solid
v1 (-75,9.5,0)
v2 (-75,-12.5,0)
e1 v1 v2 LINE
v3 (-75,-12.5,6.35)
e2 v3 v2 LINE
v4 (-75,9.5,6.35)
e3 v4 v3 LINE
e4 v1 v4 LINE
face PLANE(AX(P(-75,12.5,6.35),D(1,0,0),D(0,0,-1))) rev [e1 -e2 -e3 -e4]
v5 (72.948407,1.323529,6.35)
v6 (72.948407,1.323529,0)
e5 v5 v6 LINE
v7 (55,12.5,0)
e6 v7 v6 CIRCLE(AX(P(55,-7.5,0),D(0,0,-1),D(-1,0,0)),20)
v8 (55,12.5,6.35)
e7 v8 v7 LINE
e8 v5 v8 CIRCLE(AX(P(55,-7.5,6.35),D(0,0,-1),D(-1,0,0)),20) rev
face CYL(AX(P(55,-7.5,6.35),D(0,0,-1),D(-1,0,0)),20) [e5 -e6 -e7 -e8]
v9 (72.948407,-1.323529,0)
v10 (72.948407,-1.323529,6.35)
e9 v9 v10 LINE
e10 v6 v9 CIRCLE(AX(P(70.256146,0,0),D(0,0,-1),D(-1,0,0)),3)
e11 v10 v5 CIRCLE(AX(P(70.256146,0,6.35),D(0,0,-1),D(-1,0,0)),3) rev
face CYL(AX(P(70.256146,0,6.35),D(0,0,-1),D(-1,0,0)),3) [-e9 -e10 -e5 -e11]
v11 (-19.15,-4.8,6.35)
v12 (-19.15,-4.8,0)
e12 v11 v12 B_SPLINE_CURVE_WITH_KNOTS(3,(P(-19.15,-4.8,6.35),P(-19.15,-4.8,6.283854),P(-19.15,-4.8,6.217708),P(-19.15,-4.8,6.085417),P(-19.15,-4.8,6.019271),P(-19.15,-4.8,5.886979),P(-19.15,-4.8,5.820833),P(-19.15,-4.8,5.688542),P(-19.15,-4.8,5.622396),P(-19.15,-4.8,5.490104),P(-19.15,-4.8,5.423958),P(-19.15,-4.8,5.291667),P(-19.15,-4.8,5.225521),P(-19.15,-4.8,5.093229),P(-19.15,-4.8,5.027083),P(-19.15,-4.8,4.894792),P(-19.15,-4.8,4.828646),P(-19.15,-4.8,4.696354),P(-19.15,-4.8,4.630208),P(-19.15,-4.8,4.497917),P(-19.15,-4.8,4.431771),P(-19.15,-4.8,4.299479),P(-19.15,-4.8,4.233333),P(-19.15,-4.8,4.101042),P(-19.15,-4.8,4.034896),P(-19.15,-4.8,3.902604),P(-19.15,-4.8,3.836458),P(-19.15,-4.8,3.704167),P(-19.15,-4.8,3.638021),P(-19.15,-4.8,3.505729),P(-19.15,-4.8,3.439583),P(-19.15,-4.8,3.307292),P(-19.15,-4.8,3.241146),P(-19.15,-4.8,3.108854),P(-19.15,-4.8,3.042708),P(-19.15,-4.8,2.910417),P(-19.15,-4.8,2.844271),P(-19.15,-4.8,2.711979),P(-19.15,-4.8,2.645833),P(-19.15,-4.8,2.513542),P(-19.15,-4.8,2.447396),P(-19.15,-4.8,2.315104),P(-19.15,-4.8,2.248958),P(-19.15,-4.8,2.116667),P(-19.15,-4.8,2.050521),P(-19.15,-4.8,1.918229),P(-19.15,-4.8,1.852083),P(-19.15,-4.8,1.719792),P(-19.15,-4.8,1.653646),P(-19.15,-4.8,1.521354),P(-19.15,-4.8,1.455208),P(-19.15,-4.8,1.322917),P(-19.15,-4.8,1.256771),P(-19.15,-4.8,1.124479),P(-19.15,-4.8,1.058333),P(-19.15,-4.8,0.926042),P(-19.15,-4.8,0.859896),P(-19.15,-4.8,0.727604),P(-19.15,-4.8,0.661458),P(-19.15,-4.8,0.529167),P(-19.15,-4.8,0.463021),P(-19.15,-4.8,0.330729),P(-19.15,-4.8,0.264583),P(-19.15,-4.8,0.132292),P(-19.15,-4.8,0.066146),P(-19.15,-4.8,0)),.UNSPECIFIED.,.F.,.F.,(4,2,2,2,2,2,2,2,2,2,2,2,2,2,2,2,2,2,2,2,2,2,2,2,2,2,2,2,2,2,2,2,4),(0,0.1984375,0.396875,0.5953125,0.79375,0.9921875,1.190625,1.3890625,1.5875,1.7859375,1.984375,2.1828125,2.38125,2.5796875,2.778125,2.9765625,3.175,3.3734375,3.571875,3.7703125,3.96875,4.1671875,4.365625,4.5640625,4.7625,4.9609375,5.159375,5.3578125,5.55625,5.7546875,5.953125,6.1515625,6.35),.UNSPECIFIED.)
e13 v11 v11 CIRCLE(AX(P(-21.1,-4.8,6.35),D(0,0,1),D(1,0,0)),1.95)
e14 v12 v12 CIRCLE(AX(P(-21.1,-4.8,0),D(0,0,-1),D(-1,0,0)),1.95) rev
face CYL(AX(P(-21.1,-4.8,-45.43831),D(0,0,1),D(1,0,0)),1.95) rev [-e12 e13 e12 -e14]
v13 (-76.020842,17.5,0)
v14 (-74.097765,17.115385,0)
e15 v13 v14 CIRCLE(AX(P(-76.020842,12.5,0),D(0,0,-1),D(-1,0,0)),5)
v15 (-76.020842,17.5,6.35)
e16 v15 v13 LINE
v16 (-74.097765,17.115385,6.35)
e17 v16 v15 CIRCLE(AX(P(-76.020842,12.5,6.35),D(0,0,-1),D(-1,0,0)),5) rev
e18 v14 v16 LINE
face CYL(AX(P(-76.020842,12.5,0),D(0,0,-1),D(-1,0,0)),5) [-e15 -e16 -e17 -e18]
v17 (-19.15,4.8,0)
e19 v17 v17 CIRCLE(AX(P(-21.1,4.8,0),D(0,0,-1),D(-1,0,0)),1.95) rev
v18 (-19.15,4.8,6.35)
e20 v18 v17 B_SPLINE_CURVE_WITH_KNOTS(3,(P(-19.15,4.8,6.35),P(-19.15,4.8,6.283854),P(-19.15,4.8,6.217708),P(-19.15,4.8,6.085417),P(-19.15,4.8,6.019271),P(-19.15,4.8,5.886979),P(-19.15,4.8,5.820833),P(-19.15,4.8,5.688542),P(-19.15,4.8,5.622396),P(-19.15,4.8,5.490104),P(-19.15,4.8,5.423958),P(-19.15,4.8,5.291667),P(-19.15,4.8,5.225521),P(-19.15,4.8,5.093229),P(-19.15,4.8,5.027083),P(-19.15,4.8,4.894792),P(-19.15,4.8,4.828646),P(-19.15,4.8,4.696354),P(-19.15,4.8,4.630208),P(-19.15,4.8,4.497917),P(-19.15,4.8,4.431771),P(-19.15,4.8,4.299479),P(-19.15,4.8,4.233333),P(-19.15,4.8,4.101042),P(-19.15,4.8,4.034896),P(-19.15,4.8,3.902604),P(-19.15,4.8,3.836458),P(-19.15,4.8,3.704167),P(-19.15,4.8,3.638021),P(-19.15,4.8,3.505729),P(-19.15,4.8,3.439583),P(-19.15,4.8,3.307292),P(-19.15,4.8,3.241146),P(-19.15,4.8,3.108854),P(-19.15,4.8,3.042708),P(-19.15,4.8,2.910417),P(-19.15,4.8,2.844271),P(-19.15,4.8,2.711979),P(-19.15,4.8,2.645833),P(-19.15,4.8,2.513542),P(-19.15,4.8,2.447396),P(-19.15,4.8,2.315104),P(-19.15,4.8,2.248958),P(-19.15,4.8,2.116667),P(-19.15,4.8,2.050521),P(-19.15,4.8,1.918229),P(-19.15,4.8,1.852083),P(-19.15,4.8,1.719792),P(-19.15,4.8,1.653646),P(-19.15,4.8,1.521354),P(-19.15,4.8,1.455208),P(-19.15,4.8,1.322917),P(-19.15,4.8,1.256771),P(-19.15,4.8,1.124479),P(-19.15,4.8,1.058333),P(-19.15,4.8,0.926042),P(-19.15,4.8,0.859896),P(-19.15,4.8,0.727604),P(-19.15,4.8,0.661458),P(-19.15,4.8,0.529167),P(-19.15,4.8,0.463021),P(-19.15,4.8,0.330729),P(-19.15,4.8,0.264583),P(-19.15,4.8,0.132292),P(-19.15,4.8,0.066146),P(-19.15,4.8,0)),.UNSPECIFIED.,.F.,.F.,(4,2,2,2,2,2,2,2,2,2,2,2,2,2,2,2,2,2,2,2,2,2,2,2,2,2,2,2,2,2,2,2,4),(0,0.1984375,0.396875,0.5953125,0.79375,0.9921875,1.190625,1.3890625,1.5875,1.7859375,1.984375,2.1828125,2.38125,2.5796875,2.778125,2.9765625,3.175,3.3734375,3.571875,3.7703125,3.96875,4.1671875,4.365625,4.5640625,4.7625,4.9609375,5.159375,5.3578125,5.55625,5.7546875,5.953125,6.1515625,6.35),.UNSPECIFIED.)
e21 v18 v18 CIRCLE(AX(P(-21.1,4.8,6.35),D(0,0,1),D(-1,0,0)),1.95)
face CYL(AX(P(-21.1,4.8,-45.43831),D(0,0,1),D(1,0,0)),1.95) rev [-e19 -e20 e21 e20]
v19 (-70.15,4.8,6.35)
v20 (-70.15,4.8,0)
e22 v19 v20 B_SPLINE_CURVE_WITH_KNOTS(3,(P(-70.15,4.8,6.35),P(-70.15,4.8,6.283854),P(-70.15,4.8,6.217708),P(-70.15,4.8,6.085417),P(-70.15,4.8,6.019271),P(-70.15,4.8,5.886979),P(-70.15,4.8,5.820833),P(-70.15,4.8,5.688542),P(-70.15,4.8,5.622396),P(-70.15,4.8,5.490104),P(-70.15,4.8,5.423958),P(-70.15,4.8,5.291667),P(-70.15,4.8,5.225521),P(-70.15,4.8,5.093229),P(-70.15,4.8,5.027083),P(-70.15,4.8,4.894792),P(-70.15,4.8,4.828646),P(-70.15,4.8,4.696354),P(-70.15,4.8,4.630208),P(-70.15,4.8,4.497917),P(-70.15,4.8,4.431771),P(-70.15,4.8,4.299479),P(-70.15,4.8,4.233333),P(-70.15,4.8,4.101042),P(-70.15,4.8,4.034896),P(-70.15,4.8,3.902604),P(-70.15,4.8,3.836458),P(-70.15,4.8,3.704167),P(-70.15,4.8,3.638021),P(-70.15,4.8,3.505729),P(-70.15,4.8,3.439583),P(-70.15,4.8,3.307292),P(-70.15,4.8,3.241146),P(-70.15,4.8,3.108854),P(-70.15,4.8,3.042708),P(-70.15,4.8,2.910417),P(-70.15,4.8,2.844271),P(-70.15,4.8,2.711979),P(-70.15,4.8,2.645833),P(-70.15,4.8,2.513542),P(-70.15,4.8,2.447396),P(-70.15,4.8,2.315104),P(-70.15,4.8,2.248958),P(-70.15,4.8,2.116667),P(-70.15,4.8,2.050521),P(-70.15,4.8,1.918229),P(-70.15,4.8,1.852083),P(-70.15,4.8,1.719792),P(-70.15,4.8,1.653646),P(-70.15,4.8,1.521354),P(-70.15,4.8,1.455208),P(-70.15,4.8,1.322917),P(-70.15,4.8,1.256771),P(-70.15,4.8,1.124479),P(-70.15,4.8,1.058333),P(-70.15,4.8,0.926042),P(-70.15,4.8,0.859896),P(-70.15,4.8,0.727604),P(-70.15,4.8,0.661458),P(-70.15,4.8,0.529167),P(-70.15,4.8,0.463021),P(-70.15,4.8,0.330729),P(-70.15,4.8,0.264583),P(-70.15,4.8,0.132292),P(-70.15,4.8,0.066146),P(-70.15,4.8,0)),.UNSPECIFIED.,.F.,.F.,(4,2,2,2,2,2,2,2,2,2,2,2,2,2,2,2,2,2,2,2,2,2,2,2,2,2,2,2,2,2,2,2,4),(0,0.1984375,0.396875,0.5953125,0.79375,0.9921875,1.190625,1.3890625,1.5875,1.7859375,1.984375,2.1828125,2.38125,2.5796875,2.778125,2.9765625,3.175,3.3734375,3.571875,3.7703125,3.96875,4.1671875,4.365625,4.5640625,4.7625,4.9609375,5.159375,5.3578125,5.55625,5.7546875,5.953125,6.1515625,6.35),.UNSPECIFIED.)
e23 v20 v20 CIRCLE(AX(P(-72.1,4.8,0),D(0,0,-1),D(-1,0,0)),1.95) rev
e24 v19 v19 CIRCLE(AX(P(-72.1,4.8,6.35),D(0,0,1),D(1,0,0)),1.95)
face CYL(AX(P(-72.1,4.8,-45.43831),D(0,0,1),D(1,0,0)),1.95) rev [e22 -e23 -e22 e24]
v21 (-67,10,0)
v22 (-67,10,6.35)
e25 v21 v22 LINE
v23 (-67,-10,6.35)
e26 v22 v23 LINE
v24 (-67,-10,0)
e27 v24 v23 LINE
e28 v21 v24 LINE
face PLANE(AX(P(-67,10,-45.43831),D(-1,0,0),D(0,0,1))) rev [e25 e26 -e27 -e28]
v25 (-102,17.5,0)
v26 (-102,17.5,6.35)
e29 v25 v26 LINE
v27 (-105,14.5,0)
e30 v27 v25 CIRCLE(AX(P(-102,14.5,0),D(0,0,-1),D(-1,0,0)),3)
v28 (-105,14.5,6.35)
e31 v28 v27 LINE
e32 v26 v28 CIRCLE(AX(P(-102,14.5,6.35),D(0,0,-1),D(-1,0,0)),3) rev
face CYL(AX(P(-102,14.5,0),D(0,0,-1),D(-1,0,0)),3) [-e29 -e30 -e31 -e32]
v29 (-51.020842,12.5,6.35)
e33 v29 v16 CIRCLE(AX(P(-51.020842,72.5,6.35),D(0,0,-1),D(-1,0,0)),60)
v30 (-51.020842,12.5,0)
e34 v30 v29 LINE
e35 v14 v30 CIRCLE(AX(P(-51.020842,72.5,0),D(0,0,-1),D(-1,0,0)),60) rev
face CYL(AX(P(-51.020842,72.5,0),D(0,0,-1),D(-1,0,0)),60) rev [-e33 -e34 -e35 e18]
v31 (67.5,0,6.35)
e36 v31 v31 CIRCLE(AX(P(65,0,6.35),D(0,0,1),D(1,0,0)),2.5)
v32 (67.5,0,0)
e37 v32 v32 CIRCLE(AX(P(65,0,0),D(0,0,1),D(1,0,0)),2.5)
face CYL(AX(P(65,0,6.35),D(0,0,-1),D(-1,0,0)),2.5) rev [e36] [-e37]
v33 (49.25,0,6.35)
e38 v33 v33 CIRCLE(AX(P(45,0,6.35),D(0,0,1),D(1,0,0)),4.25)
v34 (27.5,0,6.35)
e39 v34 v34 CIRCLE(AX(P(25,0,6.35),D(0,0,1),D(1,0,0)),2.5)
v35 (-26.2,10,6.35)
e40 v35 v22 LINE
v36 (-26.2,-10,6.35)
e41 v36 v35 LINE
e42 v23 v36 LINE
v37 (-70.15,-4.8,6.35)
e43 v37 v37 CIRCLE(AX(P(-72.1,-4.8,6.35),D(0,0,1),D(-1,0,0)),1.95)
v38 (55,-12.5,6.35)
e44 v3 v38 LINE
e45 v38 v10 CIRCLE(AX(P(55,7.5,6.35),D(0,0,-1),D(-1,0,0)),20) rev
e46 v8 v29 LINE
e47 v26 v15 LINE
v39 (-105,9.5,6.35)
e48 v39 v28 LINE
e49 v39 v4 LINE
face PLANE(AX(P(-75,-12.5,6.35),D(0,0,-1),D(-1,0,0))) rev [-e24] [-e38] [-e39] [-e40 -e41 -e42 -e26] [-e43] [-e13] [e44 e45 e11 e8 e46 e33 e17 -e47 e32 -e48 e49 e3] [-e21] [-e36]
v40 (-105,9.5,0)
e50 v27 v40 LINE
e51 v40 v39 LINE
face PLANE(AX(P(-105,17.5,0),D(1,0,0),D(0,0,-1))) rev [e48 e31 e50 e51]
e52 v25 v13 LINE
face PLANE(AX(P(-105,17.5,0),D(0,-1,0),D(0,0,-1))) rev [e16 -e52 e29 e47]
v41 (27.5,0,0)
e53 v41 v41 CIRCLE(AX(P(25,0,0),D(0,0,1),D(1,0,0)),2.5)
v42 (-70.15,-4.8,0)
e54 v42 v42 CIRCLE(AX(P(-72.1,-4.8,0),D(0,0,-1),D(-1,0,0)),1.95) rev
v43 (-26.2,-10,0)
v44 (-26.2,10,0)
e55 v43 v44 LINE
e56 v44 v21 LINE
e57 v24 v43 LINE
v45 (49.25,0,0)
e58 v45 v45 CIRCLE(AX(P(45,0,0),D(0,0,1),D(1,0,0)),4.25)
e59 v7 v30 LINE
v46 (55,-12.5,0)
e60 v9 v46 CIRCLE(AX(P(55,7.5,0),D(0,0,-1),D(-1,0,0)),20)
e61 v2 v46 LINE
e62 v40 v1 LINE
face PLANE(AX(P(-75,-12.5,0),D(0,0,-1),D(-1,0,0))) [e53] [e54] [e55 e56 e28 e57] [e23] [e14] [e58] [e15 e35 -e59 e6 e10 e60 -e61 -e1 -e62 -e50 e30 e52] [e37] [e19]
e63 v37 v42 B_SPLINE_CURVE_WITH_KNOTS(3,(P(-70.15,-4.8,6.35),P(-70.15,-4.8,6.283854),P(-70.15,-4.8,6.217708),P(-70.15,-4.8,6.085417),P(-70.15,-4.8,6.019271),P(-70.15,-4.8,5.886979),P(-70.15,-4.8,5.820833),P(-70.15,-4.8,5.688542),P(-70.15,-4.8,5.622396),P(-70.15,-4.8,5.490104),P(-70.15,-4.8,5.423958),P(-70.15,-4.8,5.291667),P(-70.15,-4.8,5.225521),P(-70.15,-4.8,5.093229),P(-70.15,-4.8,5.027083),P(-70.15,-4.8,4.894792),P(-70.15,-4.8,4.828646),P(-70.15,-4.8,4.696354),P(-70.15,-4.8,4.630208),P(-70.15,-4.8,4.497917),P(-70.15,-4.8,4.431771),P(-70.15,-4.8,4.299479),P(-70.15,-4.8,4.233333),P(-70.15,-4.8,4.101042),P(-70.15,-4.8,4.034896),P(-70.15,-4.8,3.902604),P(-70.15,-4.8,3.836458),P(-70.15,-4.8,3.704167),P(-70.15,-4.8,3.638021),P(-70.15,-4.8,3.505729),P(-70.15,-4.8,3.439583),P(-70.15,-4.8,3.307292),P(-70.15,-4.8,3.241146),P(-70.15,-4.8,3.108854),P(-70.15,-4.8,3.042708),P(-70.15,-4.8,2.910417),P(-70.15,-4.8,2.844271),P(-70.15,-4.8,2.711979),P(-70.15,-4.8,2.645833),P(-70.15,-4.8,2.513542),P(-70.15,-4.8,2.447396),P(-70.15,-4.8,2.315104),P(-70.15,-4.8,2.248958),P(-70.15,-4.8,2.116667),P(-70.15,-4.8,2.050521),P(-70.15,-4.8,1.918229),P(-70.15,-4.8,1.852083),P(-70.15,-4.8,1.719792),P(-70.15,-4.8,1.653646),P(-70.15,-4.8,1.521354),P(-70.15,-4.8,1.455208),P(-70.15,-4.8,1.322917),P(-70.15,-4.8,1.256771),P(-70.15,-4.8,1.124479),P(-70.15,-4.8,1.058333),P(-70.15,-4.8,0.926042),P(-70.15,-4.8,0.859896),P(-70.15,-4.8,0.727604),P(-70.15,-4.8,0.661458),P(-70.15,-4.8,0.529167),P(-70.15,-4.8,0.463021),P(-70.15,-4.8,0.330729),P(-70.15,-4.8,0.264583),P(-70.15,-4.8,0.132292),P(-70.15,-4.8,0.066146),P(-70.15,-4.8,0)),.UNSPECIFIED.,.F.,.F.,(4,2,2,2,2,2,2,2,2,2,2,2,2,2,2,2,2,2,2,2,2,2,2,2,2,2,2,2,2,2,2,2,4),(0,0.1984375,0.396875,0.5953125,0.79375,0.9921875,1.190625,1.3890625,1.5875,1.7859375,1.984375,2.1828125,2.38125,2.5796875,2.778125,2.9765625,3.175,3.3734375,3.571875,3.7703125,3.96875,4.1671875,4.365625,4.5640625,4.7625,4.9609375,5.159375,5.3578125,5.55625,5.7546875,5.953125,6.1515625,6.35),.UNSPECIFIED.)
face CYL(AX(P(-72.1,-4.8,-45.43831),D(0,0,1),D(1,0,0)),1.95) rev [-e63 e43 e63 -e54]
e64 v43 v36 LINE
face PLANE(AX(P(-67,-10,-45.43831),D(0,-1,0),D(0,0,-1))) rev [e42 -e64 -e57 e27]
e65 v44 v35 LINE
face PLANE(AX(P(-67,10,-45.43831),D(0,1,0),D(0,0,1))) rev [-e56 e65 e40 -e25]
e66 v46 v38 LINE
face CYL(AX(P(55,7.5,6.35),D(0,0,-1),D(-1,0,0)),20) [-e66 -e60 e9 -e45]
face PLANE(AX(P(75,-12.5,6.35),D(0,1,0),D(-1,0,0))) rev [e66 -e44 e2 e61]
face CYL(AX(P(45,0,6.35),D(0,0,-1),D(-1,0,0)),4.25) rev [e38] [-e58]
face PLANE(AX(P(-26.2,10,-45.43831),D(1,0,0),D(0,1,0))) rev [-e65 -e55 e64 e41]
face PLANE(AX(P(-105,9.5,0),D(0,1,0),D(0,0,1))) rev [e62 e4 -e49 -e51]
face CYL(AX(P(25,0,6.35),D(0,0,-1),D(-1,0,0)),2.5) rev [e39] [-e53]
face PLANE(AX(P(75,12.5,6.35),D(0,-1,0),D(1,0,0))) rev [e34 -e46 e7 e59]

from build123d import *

# Parameters (mm, degrees)
SKETCH1_W           = 150
SKETCH1_H           = 25
SKETCH1_R           = 2.5
SKETCH1_R_2         = 4.25
BOSS_EXTRUDE1_DEPTH = 6.35
FILLET1_R           = 20
SKETCH2_R           = 1.95
SKETCH2_W           = 40.8
SKETCH2_H           = 20
CUT_EXTRUDE1_DEPTH  = 6.35
SKETCH3_W           = 6.35
SKETCH3_H           = 8
BOSS_EXTRUDE2_DEPTH = 30
FILLET2_R           = 60
FILLET4_R           = 5
FILLET5_R           = 3


with BuildPart() as part:
    # Sketch1 → Boss-Extrude1 (new body)
    with BuildSketch(Plane.XY):
        Rectangle(SKETCH1_W, SKETCH1_H)
        with Locations((65, 0)):
            Circle(SKETCH1_R, mode=Mode.SUBTRACT)
        with Locations((25, 0)):
            Circle(SKETCH1_R, mode=Mode.SUBTRACT)
        with Locations((45, 0)):
            Circle(SKETCH1_R_2, mode=Mode.SUBTRACT)
    extrude(amount=BOSS_EXTRUDE1_DEPTH)

    # Fillet1
    # the kernel refuses this fillet: 20 mm, written as the material it takes off along each edge
    with BuildSketch(Plane(origin=(75, 12.5, -50), x_dir=(-1, 0, 0), z_dir=(0, 0, 1))) as fillet1_piece_1:
        with BuildLine():
            CenterArc((FILLET1_R, FILLET1_R), FILLET1_R, 180, 90)
            Line((0, FILLET1_R), (0, 0))
            Line((0, 0), (FILLET1_R, 0))
        make_face()
    extrude(amount=106.35, mode=Mode.SUBTRACT)
    with BuildSketch(Plane(origin=(75, -12.5, -50), x_dir=(-1, 0, 0), z_dir=(0, 0, 1))) as fillet1_piece_2:
        with BuildLine():
            CenterArc((FILLET1_R, -FILLET1_R), FILLET1_R, 90, 90)
            Line((0, -FILLET1_R), (0, 0))
            Line((0, 0), (FILLET1_R, 0))
        make_face()
    extrude(amount=106.35, mode=Mode.SUBTRACT)

    # Sketch2 → Cut-Extrude1 (cut)
    with BuildSketch(Plane.XY.offset(6.35)):
        with Locations((-72.1, 4.8)):
            Circle(SKETCH2_R)
        with Locations((-72.1, -4.8)):
            Circle(SKETCH2_R)
        with Locations((-21.1, 4.8)):
            Circle(SKETCH2_R)
        with Locations((-21.1, -4.8)):
            Circle(SKETCH2_R)
        with Locations((-46.6, 0)):
            Rectangle(SKETCH2_W, SKETCH2_H)
    extrude(amount=-CUT_EXTRUDE1_DEPTH, mode=Mode.SUBTRACT)

    # Sketch3 → Boss-Extrude2 (add)
    with BuildSketch(Plane.ZY.offset(75)):
        with Locations((3.175, 13.5)):
            Rectangle(SKETCH3_W, SKETCH3_H)
    extrude(amount=BOSS_EXTRUDE2_DEPTH)

    # Fillet2
    # the kernel refuses this fillet: 60 mm, written as the material it adds along each edge
    with BuildSketch(Plane(origin=(-75, 12.5, 0), x_dir=(1, 0, 0), z_dir=(0, 0, 1))) as fillet2_piece_1:
        with BuildLine():
            CenterArc((23.979157617, 60), FILLET2_R, 246.443535691, 23.556464309)
            Line((0, 5), (-0.479583152, 3.9))
            ThreePointArc((-0.479583152, 3.9), (-1.2, 2.5), (-1.2, 0))
            Line((-1.2, 0), (0, -1.2))
            Line((0, -1.2), (23.979157617, -1.2))
            Line((23.979157617, -1.2), (23.979157617, 0))
        make_face()
    extrude(amount=6.35)

    # Fillet4
    fillet4_edges = [part.edges().sort_by_distance(p)[0] for p in [
        (-75, 17.5, 3.175),
    ]]
    fillet(fillet4_edges, radius=FILLET4_R)

    # Fillet5
    fillet5_edges = [part.edges().sort_by_distance(p)[0] for p in [
        (73.540496218, 0, 3.175),
        (-105, 17.5, 3.175),
    ]]
    fillet(fillet5_edges, radius=FILLET5_R)


solid = part.part
